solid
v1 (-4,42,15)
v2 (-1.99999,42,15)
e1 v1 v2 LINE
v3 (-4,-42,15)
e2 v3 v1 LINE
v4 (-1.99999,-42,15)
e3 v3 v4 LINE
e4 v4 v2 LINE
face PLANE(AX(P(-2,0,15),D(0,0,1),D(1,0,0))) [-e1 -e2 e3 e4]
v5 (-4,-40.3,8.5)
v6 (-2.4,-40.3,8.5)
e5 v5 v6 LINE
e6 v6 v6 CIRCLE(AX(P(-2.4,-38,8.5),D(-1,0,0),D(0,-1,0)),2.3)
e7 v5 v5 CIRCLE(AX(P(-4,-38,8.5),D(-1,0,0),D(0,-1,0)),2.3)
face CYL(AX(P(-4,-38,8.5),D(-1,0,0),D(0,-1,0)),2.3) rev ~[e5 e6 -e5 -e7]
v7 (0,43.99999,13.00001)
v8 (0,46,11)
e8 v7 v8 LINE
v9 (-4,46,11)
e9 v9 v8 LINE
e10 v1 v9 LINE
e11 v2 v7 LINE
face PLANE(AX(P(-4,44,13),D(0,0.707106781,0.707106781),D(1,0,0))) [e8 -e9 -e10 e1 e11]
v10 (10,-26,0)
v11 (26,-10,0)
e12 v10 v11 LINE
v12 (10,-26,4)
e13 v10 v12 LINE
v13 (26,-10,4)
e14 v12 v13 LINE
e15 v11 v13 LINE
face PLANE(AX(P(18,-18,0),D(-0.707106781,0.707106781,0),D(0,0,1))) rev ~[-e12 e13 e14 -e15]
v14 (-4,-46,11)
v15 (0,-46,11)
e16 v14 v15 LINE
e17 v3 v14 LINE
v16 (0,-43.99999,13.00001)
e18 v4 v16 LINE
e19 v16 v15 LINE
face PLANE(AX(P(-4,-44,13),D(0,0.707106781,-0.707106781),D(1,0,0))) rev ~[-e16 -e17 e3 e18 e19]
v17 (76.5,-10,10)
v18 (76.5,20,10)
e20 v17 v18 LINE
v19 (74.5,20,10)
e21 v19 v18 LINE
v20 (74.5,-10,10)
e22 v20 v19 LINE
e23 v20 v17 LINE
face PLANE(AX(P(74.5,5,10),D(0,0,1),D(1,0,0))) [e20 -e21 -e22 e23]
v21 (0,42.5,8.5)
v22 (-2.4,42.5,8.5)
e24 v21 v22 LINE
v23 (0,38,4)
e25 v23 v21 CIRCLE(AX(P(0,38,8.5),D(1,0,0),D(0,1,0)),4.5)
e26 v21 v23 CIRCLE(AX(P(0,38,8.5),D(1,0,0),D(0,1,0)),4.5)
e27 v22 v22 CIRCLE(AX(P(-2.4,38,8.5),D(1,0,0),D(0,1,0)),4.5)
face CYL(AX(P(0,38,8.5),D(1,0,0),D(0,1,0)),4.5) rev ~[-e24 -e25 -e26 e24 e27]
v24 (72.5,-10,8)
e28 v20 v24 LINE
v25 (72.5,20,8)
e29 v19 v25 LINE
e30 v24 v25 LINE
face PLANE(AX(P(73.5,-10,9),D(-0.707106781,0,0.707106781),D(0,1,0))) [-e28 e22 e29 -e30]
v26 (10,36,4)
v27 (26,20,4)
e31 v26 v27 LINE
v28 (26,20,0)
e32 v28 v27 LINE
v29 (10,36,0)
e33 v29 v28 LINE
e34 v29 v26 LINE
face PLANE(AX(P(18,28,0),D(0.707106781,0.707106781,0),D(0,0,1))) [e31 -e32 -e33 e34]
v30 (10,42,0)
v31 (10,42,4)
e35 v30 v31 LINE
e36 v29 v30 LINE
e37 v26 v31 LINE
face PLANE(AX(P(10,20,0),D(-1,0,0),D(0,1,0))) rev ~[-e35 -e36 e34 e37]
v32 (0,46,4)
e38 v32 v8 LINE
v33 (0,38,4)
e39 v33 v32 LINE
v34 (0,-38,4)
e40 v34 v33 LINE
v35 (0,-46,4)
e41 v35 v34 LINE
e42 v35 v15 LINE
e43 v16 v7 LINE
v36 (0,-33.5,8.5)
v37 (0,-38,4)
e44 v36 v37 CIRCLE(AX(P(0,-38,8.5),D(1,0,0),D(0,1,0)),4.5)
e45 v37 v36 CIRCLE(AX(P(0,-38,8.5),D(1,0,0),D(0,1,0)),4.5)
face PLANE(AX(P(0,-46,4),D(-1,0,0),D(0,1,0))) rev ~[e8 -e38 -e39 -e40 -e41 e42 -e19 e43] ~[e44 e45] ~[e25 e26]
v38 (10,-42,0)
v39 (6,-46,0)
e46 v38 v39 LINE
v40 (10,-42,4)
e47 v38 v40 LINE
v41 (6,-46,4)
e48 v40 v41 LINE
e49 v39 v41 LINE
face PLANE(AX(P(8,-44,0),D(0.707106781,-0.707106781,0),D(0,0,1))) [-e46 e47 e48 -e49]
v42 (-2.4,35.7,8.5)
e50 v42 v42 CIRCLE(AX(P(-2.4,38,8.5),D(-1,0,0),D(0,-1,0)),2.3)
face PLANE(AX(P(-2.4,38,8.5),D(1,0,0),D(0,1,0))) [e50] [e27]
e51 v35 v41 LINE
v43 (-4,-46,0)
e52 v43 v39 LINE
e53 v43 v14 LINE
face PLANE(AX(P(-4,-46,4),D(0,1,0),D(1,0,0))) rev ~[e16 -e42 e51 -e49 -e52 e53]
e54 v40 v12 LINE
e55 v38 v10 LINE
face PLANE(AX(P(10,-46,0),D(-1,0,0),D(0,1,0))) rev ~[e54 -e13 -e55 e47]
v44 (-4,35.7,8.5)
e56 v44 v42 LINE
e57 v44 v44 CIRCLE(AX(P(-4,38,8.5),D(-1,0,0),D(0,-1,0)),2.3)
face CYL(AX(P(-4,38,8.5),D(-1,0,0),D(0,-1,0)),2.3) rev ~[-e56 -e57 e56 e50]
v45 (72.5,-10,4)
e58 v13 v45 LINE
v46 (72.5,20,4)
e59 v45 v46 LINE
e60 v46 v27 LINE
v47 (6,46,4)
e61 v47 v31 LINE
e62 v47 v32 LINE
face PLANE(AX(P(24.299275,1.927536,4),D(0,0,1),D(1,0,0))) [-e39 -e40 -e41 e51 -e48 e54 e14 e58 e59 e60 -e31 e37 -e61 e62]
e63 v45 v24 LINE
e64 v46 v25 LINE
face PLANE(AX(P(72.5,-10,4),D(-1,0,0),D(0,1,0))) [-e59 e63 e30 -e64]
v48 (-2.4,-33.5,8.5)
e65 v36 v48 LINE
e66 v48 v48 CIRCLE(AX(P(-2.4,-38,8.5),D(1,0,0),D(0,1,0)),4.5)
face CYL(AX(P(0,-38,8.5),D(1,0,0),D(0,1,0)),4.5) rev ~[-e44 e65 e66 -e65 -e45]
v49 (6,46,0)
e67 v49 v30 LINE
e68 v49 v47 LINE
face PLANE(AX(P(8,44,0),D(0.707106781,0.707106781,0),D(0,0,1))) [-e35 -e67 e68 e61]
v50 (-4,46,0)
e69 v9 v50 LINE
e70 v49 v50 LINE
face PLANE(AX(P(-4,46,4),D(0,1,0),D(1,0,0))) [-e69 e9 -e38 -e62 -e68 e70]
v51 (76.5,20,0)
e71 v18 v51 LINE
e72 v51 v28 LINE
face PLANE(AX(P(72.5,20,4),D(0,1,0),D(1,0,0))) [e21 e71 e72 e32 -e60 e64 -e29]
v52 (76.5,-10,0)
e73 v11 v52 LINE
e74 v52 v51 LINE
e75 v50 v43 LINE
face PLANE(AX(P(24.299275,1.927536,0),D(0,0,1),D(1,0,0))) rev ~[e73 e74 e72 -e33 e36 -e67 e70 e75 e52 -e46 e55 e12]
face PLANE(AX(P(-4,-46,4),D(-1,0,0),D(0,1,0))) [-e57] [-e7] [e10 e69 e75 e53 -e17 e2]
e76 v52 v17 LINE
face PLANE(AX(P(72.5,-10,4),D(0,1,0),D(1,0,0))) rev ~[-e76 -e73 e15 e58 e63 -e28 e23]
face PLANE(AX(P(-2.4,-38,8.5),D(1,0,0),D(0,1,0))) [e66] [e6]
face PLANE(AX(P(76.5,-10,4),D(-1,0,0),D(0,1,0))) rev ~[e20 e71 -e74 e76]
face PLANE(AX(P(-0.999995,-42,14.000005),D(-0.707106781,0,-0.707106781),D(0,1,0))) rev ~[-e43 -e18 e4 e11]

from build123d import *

# Parameters (mm, degrees)
F2_DEPTH  = 4
F3_W      = 4
F3_H      = 30
F4_DEPTH  = 6
F5_SIZE   = 16
F6_SIZE   = 2
F7_SIZE   = 4
F8_W      = 4
F8_H      = 92
F9_DEPTH  = 11
F10_R     = 4.5
F11_DEPTH = 2.4
F12_R     = 2.3
F13_DEPTH = 4
F14_SIZE  = 4
F15_SIZE  = 1.99999


# Not quite as in the source:
# - a fillet or chamfer is up to 0.001 mm smaller than in the source, because OpenCascade refuses the exact size


with BuildPart() as f2:
    # F1 (on Top) → F2 (new body)
    with BuildSketch(Plane.XY):
        Polygon((10, 46), (-4, 46), (-4, -46), (10, -46), (10, -10), (76.5, -10), (76.5, 20), (10, 20), align=None)
    extrude(amount=F2_DEPTH)

    # F3 (on face) → F4 (join)
    with BuildSketch(Plane.XY.offset(4)):
        with Locations((74.5, 5)):
            Rectangle(F3_W, F3_H)
    extrude(amount=F4_DEPTH)

    # F5
    f5_edges = [f2.edges().sort_by_distance(p)[0] for p in [
        (10, 20, 2),
        (10, -10, 2),
    ]]
    chamfer(f5_edges, length=F5_SIZE)

    # F6
    f6_edges = [f2.edges().sort_by_distance(p)[0] for p in [
        (72.5, 5, 10),
    ]]
    chamfer(f6_edges, length=F6_SIZE)

    # F7
    f7_edges = [f2.edges().sort_by_distance(p)[0] for p in [
        (10, -46, 2),
        (10, 46, 2),
    ]]
    chamfer(f7_edges, length=F7_SIZE)

    # F8 (on face) → F9 (join)
    with BuildSketch(Plane.XY.offset(4)):
        with Locations((-2, 0)):
            Rectangle(F8_W, F8_H)
    extrude(amount=F9_DEPTH)

    # F10 (on face) → F11 (cut)
    with BuildSketch(Plane.YZ):
        with Locations((-38, 8.5)):
            Circle(F10_R)
        with Locations((38, 8.5)):
            Circle(F10_R)
    extrude(amount=-F11_DEPTH, mode=Mode.SUBTRACT)

    # F12 (on face) → F13 (cut, through all)
    with BuildSketch(Plane(origin=(-4, 0, 0), x_dir=(0, -1, 0), z_dir=(-1, 0, 0))):
        with Locations((-38, 8.5)):
            Circle(F12_R)
        with Locations((38, 8.5)):
            Circle(F12_R)
    extrude(amount=-F13_DEPTH, mode=Mode.SUBTRACT)

    # F14
    f14_edges = [f2.edges().sort_by_distance(p)[0] for p in [
        (-2, -46, 15),
        (-2, 46, 15),
    ]]
    chamfer(f14_edges, length=F14_SIZE)

    # F15 (size 2 in the source; OpenCascade refuses exactly that, so slightly less here)
    f15_edges = [f2.edges().sort_by_distance(p)[0] for p in [
        (0, 0, 15),
    ]]
    chamfer(f15_edges, length=F15_SIZE)


solid = f2.part
